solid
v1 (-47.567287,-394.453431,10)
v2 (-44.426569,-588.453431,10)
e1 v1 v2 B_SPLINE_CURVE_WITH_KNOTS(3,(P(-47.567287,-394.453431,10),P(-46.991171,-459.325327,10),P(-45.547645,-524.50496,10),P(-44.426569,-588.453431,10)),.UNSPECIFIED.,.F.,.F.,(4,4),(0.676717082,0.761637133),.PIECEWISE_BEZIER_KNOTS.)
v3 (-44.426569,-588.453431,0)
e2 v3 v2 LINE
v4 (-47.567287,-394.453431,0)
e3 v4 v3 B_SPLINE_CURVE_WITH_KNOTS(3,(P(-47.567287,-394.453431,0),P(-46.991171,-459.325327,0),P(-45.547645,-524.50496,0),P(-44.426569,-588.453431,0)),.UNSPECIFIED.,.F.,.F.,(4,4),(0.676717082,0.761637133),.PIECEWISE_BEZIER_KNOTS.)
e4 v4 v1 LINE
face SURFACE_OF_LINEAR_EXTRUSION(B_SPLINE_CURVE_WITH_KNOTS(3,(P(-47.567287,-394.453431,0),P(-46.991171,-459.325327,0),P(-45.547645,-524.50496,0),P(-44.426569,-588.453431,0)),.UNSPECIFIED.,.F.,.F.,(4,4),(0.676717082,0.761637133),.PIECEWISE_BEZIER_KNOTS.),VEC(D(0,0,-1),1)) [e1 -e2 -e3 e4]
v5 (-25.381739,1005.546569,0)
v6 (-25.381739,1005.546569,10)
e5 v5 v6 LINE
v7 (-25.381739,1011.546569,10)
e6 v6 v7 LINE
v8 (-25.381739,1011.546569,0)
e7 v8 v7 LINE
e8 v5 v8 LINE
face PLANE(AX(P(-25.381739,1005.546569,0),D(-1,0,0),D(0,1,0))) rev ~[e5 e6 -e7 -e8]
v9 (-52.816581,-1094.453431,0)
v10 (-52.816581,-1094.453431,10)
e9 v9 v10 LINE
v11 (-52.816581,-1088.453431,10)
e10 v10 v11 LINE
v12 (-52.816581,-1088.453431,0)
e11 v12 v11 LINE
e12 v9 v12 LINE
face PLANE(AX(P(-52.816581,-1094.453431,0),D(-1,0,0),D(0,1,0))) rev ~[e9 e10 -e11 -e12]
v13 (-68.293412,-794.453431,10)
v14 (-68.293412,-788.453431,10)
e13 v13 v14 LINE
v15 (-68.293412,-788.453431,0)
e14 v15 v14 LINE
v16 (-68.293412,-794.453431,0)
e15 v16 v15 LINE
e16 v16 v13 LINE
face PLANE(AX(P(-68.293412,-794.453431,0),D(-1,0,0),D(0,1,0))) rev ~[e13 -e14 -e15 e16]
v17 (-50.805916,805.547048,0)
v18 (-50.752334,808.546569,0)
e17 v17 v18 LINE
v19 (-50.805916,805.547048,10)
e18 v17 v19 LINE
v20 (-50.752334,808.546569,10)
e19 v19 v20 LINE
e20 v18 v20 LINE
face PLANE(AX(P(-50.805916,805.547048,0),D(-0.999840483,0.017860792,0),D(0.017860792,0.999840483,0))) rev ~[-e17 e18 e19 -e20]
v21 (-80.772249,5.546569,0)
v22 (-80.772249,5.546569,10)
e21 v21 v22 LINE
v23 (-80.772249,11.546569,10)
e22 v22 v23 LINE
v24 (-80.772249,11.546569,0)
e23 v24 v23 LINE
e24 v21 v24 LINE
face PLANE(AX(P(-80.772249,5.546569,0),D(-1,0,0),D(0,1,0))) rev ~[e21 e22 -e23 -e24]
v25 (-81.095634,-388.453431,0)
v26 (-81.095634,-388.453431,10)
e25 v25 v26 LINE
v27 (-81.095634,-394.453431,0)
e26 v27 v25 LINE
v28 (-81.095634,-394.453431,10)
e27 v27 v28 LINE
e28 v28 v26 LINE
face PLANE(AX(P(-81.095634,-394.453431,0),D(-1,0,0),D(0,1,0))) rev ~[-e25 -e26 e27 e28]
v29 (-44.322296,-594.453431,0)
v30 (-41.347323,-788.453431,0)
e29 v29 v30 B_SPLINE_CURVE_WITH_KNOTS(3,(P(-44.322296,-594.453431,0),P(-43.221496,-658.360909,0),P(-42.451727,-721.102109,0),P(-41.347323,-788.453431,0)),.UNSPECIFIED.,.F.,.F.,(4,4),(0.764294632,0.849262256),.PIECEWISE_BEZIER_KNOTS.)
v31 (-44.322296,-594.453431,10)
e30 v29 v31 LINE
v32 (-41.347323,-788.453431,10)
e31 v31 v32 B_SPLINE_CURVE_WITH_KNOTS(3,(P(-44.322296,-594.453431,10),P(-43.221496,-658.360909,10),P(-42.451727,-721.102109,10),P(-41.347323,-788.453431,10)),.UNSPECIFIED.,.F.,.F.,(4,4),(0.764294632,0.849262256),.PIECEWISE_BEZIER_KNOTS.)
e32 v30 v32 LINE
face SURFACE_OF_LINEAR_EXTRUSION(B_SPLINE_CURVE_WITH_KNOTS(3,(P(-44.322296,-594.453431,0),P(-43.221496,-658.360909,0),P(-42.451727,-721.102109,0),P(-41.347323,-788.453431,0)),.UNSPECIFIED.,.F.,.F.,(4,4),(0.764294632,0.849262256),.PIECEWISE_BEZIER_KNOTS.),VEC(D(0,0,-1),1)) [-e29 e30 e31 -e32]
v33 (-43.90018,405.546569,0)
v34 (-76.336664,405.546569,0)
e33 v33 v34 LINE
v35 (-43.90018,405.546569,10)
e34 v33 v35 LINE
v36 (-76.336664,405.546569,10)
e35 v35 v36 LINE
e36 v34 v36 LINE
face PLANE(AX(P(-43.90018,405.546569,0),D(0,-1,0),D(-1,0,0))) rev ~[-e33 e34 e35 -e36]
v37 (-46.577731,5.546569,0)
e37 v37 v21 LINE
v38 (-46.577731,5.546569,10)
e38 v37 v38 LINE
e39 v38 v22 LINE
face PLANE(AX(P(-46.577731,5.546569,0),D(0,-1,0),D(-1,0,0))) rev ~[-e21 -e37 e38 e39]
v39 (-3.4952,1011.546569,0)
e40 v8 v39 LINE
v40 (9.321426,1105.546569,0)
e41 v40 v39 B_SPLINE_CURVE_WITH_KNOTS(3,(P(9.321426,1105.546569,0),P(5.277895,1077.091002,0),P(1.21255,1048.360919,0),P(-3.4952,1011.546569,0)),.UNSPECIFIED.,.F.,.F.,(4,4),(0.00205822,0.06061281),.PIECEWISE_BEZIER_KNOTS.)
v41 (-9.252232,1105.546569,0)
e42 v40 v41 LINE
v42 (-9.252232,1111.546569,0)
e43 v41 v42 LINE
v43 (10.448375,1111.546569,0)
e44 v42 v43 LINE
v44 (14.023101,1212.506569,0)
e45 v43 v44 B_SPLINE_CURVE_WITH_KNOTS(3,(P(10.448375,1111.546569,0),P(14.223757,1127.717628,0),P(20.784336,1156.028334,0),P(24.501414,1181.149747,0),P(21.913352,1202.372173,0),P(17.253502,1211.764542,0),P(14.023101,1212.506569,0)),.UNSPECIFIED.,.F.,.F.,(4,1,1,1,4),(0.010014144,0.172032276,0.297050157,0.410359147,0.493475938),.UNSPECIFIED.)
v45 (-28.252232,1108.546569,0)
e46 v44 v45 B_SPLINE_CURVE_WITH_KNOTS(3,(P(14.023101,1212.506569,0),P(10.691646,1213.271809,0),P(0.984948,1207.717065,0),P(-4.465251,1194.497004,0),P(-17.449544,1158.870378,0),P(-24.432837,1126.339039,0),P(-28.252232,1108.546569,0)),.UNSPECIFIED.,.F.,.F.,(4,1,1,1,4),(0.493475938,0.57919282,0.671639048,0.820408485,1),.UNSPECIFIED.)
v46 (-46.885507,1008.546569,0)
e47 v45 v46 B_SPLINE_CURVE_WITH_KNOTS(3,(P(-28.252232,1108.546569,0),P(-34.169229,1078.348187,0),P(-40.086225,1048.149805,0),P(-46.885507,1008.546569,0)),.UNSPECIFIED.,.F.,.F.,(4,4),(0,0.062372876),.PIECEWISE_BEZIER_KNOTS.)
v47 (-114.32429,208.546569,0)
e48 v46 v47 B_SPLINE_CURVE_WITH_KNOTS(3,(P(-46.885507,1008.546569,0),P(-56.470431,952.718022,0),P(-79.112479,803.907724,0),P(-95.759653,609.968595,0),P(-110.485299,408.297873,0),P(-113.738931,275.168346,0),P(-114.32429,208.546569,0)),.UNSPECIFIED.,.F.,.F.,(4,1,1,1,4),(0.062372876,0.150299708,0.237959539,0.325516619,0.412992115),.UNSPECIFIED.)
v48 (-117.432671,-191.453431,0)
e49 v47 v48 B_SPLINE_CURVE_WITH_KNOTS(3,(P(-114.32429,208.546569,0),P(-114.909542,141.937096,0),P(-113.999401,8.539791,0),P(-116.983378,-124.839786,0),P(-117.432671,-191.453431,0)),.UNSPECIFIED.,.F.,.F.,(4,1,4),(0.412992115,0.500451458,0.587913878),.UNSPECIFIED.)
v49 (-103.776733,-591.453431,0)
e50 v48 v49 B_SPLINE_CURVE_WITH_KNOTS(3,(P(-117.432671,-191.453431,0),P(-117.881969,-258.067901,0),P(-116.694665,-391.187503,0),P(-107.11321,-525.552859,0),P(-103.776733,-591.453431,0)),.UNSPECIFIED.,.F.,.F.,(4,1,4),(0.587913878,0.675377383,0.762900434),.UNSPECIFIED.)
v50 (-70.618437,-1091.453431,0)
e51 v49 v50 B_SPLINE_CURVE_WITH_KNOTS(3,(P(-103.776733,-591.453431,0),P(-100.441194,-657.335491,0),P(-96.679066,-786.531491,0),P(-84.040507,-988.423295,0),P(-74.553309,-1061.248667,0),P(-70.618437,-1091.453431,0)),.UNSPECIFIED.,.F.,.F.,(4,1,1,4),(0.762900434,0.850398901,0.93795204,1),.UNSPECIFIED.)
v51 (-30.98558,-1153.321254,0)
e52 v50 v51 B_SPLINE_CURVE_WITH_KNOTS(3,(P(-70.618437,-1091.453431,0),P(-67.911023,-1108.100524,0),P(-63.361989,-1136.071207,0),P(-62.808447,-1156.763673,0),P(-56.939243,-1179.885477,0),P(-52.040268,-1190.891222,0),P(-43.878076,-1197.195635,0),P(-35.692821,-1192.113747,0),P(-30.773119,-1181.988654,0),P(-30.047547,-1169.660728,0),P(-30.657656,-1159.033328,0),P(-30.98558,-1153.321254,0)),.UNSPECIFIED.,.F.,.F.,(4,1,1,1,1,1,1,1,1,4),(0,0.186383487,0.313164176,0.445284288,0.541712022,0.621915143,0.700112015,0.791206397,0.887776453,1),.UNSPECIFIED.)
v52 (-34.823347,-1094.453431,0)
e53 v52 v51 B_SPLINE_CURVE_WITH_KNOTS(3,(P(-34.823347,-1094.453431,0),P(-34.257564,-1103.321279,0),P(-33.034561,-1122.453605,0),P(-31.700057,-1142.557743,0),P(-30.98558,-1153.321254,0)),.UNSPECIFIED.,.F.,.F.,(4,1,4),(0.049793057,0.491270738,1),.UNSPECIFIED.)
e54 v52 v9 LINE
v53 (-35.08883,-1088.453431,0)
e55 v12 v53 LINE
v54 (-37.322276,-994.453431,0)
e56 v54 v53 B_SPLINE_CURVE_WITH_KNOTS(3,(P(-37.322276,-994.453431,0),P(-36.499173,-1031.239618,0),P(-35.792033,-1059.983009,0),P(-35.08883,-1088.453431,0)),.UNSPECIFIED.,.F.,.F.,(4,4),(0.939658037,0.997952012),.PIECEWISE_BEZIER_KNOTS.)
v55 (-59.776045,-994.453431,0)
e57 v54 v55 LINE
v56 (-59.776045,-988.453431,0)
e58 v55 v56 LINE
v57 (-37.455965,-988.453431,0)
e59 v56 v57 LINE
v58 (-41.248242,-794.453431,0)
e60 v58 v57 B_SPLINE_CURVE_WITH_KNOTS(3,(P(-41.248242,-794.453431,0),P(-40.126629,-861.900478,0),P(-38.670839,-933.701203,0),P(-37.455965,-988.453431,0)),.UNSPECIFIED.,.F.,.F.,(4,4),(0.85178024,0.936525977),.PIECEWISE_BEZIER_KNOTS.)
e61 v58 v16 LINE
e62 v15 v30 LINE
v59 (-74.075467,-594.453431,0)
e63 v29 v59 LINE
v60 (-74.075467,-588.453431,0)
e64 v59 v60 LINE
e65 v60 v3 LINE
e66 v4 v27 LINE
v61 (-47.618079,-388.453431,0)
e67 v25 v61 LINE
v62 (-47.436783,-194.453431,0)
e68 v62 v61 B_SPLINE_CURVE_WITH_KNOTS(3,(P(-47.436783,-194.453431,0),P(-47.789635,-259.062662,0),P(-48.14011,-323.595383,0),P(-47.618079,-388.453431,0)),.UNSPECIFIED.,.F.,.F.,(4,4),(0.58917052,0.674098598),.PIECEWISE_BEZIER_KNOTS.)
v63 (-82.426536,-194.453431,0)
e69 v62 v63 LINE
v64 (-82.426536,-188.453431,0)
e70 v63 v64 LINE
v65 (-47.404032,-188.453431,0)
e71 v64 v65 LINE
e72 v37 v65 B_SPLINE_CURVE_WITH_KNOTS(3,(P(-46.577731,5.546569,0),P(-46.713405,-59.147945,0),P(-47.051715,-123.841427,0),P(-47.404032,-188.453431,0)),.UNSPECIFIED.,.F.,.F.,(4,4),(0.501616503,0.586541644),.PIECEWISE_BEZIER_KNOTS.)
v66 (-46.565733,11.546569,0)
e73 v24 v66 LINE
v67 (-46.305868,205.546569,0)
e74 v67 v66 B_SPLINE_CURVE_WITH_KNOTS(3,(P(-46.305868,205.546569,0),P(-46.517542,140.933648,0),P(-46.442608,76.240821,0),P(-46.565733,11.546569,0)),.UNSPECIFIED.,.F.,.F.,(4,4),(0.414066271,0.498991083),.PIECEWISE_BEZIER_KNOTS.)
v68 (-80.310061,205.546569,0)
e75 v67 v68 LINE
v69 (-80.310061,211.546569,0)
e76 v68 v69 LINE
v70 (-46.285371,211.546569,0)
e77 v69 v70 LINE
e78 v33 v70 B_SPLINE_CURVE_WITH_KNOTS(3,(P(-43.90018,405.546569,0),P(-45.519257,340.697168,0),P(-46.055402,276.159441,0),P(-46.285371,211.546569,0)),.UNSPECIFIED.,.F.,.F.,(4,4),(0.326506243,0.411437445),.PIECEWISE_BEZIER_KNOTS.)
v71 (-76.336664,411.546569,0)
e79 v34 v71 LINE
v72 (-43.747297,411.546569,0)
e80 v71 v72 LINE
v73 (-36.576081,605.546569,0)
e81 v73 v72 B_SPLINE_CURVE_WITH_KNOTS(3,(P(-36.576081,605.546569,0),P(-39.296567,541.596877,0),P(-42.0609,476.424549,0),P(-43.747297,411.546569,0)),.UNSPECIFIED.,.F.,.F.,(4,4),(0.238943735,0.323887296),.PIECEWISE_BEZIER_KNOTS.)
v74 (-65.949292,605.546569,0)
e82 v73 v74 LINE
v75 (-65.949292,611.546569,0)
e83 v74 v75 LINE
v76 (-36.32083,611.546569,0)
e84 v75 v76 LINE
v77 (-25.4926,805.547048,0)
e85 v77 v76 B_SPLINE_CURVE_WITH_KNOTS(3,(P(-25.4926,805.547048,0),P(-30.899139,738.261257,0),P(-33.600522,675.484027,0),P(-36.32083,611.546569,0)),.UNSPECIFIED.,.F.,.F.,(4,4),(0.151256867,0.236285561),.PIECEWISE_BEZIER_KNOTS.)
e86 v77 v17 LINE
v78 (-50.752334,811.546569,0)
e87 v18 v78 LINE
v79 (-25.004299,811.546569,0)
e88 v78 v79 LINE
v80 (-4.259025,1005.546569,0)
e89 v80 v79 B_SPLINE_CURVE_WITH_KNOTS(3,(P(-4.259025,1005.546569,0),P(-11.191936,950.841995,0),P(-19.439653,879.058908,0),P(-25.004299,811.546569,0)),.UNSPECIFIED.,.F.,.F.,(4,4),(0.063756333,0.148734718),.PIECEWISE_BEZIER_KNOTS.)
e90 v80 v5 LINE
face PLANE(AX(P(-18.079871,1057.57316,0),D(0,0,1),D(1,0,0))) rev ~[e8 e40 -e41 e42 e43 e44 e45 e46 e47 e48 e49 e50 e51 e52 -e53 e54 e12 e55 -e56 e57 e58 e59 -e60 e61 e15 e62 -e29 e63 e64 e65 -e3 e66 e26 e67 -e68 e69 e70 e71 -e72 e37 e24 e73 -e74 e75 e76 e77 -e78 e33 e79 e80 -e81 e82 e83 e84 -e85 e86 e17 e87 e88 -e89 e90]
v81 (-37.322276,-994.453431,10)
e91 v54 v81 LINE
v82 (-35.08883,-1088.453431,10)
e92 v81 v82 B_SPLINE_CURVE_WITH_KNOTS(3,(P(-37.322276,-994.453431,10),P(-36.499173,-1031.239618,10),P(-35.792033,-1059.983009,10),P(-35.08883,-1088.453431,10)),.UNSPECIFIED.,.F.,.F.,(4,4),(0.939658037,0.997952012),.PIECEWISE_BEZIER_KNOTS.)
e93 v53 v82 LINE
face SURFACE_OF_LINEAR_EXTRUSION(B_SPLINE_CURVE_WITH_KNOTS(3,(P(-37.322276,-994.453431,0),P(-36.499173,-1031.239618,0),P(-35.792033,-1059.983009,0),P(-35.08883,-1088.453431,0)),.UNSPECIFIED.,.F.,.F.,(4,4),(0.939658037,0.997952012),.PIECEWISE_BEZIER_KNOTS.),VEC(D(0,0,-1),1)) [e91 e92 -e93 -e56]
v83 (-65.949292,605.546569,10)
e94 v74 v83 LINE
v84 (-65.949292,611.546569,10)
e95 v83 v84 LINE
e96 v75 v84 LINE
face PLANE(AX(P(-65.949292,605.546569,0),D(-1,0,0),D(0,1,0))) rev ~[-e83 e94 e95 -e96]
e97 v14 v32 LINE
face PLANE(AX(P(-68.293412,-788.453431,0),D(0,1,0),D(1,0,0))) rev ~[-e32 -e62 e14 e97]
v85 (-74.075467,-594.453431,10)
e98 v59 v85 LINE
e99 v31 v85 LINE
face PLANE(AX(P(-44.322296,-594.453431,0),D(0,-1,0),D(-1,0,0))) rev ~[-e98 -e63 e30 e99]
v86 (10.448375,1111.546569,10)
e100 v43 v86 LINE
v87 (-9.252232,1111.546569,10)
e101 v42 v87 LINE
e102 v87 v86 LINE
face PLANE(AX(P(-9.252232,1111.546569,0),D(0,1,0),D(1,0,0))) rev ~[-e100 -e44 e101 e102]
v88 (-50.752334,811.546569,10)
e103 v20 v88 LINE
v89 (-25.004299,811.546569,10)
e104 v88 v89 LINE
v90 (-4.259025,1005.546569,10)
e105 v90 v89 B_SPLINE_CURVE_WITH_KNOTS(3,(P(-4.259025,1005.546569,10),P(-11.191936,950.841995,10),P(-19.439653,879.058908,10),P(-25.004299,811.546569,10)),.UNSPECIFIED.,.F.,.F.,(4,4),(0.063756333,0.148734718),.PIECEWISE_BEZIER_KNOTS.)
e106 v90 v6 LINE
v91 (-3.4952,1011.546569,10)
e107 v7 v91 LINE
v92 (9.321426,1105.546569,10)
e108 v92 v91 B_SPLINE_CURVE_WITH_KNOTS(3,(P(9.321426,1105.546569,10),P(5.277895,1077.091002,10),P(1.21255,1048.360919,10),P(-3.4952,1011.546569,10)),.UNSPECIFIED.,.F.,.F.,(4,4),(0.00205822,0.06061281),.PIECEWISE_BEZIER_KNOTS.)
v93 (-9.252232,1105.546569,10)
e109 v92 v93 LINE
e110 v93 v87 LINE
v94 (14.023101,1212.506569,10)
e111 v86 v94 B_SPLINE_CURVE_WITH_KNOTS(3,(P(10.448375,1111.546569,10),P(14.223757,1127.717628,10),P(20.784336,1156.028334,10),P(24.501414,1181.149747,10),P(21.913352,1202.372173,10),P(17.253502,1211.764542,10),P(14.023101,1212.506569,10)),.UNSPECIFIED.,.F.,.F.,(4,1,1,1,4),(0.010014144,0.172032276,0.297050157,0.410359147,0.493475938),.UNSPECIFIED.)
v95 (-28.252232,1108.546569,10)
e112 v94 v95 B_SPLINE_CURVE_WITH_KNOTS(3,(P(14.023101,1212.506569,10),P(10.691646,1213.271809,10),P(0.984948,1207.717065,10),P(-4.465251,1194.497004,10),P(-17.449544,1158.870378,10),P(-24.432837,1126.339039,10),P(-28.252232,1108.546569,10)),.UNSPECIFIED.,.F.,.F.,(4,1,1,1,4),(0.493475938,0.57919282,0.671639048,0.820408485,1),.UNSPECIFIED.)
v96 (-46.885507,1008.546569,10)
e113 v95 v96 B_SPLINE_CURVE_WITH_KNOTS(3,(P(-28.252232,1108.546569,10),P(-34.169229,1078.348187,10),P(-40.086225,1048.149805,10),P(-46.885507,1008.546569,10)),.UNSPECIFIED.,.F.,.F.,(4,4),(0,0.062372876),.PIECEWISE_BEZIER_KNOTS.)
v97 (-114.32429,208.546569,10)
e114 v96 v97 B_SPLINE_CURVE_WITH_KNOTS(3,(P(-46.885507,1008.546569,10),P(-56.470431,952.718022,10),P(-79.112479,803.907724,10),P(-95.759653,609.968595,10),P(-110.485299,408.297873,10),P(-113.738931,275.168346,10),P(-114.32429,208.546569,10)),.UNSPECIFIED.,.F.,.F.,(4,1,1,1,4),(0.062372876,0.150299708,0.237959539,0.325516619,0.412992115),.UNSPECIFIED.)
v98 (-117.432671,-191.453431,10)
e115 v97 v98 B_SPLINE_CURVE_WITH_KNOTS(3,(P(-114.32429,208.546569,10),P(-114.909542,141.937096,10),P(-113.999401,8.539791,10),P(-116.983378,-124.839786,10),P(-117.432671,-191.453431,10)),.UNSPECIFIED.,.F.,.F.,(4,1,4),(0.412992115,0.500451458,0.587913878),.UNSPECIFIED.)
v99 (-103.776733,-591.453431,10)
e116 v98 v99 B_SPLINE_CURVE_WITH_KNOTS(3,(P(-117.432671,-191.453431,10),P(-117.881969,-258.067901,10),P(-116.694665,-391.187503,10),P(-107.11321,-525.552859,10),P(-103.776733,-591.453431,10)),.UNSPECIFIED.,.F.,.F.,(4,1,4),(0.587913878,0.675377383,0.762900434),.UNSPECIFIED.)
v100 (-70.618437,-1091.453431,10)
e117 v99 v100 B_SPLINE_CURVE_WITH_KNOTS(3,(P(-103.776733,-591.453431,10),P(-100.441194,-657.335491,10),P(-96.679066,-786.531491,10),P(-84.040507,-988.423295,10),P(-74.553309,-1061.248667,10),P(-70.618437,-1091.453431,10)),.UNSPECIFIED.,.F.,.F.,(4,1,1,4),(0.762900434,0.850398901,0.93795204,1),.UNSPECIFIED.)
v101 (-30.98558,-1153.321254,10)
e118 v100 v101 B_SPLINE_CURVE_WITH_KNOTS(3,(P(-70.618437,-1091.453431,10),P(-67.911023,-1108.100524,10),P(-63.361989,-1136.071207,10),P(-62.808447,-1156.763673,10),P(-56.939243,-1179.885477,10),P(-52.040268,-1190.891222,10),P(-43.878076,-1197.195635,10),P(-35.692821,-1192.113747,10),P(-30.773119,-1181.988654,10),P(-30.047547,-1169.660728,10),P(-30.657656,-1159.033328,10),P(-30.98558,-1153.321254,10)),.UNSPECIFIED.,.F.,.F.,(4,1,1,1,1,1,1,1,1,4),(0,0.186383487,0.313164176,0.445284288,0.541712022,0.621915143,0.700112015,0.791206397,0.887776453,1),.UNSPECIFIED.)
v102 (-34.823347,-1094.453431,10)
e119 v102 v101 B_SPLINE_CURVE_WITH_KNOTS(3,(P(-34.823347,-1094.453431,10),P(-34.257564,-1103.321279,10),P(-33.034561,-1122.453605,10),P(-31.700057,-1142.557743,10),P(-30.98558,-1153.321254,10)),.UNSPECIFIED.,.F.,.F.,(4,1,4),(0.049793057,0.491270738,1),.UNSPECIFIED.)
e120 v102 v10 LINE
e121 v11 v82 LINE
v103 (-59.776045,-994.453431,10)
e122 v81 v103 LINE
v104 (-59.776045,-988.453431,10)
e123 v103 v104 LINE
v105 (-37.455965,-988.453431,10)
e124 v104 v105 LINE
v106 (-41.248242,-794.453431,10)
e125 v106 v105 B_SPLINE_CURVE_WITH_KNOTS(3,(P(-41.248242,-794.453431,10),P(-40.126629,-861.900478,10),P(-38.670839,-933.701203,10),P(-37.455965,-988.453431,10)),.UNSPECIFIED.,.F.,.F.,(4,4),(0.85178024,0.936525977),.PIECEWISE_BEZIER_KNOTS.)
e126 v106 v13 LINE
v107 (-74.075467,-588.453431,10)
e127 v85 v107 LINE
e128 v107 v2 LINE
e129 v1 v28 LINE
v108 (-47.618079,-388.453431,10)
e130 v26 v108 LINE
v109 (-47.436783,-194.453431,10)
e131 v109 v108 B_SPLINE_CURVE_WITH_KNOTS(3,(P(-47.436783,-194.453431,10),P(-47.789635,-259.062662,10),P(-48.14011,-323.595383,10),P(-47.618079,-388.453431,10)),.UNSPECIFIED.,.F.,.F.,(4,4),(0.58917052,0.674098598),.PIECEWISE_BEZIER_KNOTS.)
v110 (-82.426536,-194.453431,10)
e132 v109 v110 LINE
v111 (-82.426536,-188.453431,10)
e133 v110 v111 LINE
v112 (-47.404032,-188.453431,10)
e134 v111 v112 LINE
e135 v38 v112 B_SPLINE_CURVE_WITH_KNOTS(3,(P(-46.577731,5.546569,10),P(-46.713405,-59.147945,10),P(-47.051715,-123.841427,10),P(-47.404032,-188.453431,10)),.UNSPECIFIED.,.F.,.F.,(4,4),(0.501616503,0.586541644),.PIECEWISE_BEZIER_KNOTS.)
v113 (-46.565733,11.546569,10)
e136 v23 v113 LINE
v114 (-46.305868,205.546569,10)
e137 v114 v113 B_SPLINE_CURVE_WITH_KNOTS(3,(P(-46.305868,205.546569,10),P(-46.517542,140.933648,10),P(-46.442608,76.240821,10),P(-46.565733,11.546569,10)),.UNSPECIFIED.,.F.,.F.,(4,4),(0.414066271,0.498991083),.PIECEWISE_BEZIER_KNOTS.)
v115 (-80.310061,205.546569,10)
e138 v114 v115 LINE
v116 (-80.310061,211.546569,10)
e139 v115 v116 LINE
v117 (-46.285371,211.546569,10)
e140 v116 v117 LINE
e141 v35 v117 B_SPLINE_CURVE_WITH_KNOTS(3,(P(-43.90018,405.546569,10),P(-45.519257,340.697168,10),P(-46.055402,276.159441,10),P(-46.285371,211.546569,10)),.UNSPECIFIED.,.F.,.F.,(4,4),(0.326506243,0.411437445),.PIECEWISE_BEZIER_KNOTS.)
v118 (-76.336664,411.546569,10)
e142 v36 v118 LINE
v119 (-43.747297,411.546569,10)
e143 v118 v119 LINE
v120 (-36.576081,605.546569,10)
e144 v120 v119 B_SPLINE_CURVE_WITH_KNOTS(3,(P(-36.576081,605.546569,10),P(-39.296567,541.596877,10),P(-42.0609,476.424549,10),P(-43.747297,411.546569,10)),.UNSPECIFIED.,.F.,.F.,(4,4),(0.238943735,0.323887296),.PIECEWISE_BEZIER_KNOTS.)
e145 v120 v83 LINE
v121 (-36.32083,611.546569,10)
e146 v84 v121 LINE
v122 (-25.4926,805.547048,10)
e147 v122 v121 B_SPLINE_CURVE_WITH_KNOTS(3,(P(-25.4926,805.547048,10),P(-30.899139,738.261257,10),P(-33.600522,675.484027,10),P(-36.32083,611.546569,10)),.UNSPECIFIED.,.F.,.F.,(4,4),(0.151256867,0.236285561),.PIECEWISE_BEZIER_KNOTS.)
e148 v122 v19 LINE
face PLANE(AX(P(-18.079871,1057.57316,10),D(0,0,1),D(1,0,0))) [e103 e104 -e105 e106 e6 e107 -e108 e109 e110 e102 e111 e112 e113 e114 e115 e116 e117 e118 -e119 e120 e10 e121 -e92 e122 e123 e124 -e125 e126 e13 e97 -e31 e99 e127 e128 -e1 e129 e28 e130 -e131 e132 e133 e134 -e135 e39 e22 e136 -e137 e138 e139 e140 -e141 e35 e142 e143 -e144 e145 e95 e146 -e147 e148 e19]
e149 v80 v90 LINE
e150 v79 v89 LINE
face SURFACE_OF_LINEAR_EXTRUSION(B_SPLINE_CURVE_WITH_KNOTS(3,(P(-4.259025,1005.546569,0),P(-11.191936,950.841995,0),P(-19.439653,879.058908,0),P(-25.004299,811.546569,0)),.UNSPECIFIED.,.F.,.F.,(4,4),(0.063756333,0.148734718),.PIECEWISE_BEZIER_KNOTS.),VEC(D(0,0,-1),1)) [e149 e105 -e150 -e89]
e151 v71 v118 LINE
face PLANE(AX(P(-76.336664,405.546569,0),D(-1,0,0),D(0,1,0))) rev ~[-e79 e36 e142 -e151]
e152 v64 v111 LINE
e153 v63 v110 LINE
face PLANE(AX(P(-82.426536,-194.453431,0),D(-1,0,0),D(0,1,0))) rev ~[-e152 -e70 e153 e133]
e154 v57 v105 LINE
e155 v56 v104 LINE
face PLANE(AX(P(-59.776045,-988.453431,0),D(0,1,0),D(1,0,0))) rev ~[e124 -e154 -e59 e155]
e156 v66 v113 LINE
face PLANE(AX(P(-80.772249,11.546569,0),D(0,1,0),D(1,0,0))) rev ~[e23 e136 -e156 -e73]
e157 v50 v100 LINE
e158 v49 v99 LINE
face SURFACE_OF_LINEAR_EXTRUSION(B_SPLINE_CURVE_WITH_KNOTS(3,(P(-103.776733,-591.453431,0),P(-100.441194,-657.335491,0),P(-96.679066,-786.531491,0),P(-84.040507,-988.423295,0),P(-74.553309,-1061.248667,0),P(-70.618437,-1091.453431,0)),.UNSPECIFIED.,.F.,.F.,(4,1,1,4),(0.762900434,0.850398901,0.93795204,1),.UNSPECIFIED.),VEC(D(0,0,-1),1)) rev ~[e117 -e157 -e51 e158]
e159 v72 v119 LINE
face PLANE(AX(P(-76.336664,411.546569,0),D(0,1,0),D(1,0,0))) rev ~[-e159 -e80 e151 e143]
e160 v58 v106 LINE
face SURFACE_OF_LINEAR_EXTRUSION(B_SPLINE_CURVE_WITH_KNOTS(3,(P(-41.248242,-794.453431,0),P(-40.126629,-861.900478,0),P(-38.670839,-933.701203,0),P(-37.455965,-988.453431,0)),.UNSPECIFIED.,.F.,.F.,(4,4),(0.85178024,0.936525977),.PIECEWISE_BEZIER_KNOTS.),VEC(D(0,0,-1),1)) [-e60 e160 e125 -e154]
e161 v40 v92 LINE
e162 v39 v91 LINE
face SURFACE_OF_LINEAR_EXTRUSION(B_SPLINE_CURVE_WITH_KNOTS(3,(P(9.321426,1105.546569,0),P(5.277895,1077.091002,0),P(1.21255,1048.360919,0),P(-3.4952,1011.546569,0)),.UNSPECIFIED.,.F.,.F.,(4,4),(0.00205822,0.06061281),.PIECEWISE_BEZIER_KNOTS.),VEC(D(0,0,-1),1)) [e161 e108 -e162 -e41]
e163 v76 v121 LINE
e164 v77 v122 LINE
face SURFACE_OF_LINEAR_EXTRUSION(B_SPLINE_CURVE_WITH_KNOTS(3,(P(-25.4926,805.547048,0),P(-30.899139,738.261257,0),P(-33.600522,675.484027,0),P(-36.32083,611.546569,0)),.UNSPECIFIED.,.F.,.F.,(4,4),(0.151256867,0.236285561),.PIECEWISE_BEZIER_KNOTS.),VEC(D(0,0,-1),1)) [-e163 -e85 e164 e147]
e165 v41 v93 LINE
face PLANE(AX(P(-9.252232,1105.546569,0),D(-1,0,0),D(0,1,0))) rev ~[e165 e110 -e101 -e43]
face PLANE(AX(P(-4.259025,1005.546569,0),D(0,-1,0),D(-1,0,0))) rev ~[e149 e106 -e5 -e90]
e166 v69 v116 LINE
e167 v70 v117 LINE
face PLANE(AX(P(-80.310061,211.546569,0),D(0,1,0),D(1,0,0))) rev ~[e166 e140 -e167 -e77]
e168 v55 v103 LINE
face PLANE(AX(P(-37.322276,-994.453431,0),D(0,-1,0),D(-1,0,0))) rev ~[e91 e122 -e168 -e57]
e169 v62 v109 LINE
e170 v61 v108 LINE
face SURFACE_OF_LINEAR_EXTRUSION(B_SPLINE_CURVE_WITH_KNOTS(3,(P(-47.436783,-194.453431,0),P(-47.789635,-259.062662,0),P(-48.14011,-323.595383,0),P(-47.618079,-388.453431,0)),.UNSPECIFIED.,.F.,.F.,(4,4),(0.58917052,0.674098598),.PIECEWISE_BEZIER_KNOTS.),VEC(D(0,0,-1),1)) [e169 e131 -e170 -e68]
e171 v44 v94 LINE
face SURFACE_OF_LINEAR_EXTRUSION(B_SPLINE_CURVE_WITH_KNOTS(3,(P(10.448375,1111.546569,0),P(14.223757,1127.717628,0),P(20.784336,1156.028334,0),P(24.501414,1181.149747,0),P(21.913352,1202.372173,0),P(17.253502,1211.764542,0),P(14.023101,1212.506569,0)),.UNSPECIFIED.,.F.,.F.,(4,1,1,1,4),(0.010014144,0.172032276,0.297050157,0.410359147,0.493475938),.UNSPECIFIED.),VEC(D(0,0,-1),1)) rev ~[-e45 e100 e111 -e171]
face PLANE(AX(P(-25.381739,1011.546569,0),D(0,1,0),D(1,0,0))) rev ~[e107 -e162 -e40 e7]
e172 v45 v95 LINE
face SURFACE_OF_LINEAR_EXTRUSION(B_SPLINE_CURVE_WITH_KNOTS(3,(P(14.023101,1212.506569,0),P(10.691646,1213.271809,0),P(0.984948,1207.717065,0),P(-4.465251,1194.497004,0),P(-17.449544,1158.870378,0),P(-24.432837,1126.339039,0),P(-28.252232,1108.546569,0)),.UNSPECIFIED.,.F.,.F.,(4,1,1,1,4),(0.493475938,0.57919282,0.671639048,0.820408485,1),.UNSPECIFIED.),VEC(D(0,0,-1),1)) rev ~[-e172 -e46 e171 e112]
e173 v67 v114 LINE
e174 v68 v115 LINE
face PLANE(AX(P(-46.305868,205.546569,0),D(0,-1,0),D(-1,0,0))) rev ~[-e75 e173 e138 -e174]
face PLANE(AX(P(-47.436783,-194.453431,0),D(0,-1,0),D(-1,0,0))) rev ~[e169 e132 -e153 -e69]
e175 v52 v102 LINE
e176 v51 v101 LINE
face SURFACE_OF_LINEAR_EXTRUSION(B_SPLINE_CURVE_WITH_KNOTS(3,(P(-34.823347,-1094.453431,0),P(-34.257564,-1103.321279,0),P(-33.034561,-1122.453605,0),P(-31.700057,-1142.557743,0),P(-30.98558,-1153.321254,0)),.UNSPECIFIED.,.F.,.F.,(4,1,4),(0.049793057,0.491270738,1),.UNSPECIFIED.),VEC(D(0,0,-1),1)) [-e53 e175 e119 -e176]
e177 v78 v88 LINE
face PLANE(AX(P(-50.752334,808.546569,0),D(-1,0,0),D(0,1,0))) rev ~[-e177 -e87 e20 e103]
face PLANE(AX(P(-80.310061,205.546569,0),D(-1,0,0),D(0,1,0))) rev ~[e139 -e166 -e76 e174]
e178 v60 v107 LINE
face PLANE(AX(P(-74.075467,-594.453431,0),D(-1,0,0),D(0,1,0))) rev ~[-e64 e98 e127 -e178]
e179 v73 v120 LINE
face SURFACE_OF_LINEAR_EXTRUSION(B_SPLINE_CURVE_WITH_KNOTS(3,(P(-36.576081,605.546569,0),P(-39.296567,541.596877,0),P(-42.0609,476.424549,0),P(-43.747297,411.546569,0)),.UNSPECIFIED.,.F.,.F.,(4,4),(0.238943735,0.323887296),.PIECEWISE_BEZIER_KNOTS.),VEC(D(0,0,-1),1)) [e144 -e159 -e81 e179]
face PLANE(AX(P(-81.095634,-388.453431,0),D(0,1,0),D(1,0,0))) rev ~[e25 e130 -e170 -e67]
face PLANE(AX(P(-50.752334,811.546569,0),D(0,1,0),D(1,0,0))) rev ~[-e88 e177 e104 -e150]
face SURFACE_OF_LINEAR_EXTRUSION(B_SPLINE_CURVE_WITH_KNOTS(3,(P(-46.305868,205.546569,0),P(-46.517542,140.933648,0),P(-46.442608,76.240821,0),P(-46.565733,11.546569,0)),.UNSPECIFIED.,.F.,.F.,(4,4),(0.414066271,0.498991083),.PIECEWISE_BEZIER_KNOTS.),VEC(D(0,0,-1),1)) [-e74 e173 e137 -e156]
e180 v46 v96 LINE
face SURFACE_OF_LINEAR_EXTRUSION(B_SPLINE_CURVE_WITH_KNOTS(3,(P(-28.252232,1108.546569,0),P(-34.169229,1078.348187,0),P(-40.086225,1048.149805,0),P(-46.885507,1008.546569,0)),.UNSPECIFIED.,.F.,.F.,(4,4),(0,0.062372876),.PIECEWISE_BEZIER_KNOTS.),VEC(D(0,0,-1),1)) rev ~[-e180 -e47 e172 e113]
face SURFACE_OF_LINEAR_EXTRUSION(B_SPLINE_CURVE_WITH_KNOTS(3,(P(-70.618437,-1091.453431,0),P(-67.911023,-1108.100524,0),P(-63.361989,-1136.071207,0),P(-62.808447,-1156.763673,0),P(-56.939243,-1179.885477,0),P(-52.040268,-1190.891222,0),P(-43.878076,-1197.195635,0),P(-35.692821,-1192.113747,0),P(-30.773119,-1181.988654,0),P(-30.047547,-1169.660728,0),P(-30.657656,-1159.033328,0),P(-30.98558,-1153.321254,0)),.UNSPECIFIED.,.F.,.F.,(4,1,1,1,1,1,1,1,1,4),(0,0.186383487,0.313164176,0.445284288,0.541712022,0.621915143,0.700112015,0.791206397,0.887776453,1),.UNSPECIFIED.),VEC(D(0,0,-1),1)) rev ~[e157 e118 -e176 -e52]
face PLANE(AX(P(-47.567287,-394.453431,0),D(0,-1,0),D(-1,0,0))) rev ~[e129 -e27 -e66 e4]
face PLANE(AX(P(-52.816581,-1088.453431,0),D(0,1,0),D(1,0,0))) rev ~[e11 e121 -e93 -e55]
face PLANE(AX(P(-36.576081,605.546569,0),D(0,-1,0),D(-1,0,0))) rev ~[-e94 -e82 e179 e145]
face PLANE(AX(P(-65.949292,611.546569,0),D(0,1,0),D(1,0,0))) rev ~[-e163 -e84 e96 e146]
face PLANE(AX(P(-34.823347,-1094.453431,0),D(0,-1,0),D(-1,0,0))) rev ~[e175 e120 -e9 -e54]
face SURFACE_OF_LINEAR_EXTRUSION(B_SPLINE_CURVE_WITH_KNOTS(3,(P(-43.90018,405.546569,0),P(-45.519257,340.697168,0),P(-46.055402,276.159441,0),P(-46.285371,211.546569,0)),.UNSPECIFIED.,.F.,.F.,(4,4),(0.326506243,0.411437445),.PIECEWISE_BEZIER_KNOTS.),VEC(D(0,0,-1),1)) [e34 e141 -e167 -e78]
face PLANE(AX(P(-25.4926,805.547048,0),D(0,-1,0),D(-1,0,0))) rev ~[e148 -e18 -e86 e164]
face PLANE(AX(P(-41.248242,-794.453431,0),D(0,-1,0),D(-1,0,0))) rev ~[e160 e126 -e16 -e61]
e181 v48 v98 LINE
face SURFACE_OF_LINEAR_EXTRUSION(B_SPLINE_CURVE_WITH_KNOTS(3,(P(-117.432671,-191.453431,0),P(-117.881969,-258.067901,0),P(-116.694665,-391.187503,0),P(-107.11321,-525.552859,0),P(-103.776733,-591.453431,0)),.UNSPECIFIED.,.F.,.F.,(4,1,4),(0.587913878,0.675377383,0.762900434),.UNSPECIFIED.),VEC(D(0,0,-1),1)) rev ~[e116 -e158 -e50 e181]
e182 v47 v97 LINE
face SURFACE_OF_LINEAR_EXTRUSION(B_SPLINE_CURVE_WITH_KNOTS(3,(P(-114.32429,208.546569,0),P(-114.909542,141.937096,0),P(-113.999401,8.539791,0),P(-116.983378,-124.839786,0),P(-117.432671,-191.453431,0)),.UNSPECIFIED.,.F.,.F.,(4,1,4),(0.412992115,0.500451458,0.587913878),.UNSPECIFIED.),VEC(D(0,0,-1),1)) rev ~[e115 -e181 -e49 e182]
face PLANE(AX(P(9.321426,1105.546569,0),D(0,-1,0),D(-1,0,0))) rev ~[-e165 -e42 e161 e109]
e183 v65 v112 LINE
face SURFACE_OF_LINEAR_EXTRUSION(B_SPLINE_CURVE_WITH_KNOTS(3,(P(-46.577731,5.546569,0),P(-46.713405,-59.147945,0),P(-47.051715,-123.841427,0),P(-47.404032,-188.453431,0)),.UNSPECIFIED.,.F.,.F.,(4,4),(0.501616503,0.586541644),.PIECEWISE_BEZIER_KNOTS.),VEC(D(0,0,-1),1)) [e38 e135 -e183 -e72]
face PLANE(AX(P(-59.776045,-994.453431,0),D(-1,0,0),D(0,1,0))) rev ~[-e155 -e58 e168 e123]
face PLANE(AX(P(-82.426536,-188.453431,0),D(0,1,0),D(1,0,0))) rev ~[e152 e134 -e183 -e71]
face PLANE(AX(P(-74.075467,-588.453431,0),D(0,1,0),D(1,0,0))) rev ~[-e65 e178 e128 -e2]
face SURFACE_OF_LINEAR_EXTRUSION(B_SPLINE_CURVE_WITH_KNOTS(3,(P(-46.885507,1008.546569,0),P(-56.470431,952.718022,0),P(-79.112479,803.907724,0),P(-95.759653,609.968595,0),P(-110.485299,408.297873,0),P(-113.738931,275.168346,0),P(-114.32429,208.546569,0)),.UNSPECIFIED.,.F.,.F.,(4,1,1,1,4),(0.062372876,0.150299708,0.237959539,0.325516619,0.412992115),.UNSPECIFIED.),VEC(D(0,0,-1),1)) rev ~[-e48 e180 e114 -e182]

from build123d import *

# Parameters (mm, degrees)
F1_DEPTH = 10


# Not quite as in the source:
# - a feature names something its author has since deleted; it is built from what else it names


with BuildPart() as f1:
    # F0 (on Top) → F1 (new body)
    with BuildSketch(Plane.XY):
        with BuildLine():
            Line((-9.2522319783, 1105.5465694817), (-9.2522319783, 1108.5465694817))
            Line((-9.2522319783, 1108.5465694817), (-28.2522319783, 1108.5465694817))
            add(Edge.make_bspline(
                [(-28.2522319783, 1108.5465694817), (-34.1692287273, 1078.3481872981), (-40.0862254764, 1048.1498051145), (-46.885506853, 1008.5465694817)],
                knots=[0, 0, 0, 0, 0.0623728759, 0.0623728759, 0.0623728759, 0.0623728759], degree=3))
            Line((-46.885506853, 1008.5465694817), (-25.3817387583, 1008.5465694817))
            Line((-25.3817387583, 1008.5465694817), (-25.3817387583, 1011.5465694817))
            Line((-25.3817387583, 1011.5465694817), (-3.4951998214, 1011.5465694817))
            add(Edge.make_bspline(
                [(9.3214260817, 1105.5465694817), (5.2778951966, 1077.0910022719), (1.2125502532, 1048.3609188135), (-3.4951998214, 1011.5465694817)],
                knots=[0.0020582204, 0.0020582204, 0.0020582204, 0.0020582204, 0.0606128099, 0.0606128099, 0.0606128099, 0.0606128099], degree=3))
            Line((9.3214260817, 1105.5465694817), (-9.2522319783, 1105.5465694817))
        make_face()
        with BuildLine():
            Line((-28.2522319783, 1108.5465694817), (-9.2522319783, 1108.5465694817))
            Line((-9.2522319783, 1108.5465694817), (-9.2522319783, 1111.5465694817))
            Line((-9.2522319783, 1111.5465694817), (10.4483753261, 1111.5465694817))
            add(Edge.make_bspline(
                [(10.4483753261, 1111.5465694817), (14.2237569857, 1127.7176279013), (20.7843357368, 1156.0283342705), (24.50141426, 1181.1497468298), (21.913351831, 1202.3721726285), (17.2535020339, 1211.7645420112), (14.0231014783, 1212.5065694817)],
                knots=[0.0100141442, 0.0100141442, 0.0100141442, 0.0100141442, 0.1720322765, 0.2970501568, 0.4103591472, 0.4934759383, 0.4934759383, 0.4934759383, 0.4934759383], degree=3))
            add(Edge.make_bspline(
                [(14.0231014783, 1212.5065694817), (10.6916463361, 1213.2718093304), (0.9849483202, 1207.717065294), (-4.4652508998, 1194.4970040922), (-17.4495437423, 1158.8703779353), (-24.4328369098, 1126.3390394336), (-28.2522319783, 1108.5465694817)],
                knots=[0.4934759383, 0.4934759383, 0.4934759383, 0.4934759383, 0.5791928197, 0.6716390479, 0.8204084848, 1, 1, 1, 1], degree=3))
        make_face()
        with BuildLine():
            Line((-25.3817387583, 1008.5465694817), (-46.885506853, 1008.5465694817))
            add(Edge.make_bspline(
                [(-46.885506853, 1008.5465694817), (-56.4704307745, 952.7180223817), (-67.8086700034, 878.1997316325), (-76.2546409025, 808.5465694817)],
                knots=[0.0623728759, 0.0623728759, 0.0623728759, 0.0623728759, 0.1502997077, 0.1502997077, 0.1502997077, 0.1502997077], degree=3))
            Line((-76.2546409025, 808.5465694817), (-50.7523337375, 808.5465694817))
            Line((-50.7523337375, 808.5465694817), (-50.7523337375, 811.5465694817))
            Line((-50.7523337375, 811.5465694817), (-25.0042987138, 811.5465694817))
            add(Edge.make_bspline(
                [(-4.2590252459, 1005.5465694817), (-11.1919357354, 950.8419950912), (-19.4396527515, 879.0589079331), (-25.0042987138, 811.5465694817)],
                knots=[0.0637563334, 0.0637563334, 0.0637563334, 0.0637563334, 0.1487347177, 0.1487347177, 0.1487347177, 0.1487347177], degree=3))
            Line((-4.2590252459, 1005.5465694817), (-25.3817387583, 1005.5465694817))
            Line((-25.3817387583, 1005.5465694817), (-25.3817387583, 1008.5465694817))
        make_face()
        with BuildLine():
            Line((-50.7523337375, 808.5465694817), (-76.2546409025, 808.5465694817))
            add(Edge.make_bspline(
                [(-76.2546409025, 808.5465694817), (-84.6749646264, 739.1049172777), (-90.2205587707, 674.4988914733), (-95.4501271993, 608.5465694817)],
                knots=[0.1502997077, 0.1502997077, 0.1502997077, 0.1502997077, 0.2379595395, 0.2379595395, 0.2379595395, 0.2379595395], degree=3))
            Line((-95.4501271993, 608.5465694817), (-65.9492915816, 608.5465694817))
            Line((-65.9492915816, 608.5465694817), (-65.9492915816, 611.5465694817))
            Line((-65.9492915816, 611.5465694817), (-36.3208296657, 611.5465694817))
            add(Edge.make_bspline(
                [(-25.492600007, 805.5470480317), (-30.8991386303, 738.261256599), (-33.600522451, 675.484027067), (-36.3208296657, 611.5465694817)],
                knots=[0.1512568673, 0.1512568673, 0.1512568673, 0.1512568673, 0.2362855612, 0.2362855612, 0.2362855612, 0.2362855612], degree=3))
            Line((-25.492600007, 805.5470480317), (-50.8059161147, 805.5470480317))
            Line((-50.8059161147, 805.5470480317), (-50.7523337375, 808.5465694817))
        make_face()
        with BuildLine():
            Line((-65.9492915816, 608.5465694817), (-95.4501271993, 608.5465694817))
            add(Edge.make_bspline(
                [(-95.4501271993, 608.5465694817), (-100.6735657013, 542.6715546134), (-105.5817189232, 475.4533978756), (-108.8488180837, 408.5465694817)],
                knots=[0.2379595395, 0.2379595395, 0.2379595395, 0.2379595395, 0.3255166193, 0.3255166193, 0.3255166193, 0.3255166193], degree=3))
            Line((-108.8488180837, 408.5465694817), (-76.3366638949, 408.5465694817))
            Line((-76.3366638949, 408.5465694817), (-76.3366638949, 411.5465694817))
            Line((-76.3366638949, 411.5465694817), (-43.7472965242, 411.5465694817))
            add(Edge.make_bspline(
                [(-36.576081022, 605.5465694817), (-39.2965672487, 541.5968769288), (-42.0608997966, 476.4245488132), (-43.7472965243, 411.5465694817)],
                knots=[0.2389437345, 0.2389437345, 0.2389437345, 0.2389437345, 0.3238872962, 0.3238872962, 0.3238872962, 0.3238872962], degree=3))
            Line((-36.576081022, 605.5465694817), (-65.9492915816, 605.5465694817))
            Line((-65.9492915816, 605.5465694817), (-65.9492915816, 608.5465694817))
        make_face()
        with BuildLine():
            Line((-76.3366638949, 408.5465694817), (-108.8488180837, 408.5465694817))
            add(Edge.make_bspline(
                [(-108.8488180837, 408.5465694817), (-112.112873039, 341.7020832768), (-113.7389306982, 275.1683455095), (-114.3242902488, 208.5465694817)],
                knots=[0.3255166193, 0.3255166193, 0.3255166193, 0.3255166193, 0.4129921155, 0.4129921155, 0.4129921155, 0.4129921155], degree=3))
            Line((-114.3242902488, 208.5465694817), (-80.310060953, 208.5465694817))
            Line((-80.310060953, 208.5465694817), (-80.310060953, 211.5465694817))
            Line((-80.310060953, 211.5465694817), (-46.2853714025, 211.5465694817))
            add(Edge.make_bspline(
                [(-43.9001795453, 405.5465694817), (-45.519256644, 340.6971675299), (-46.0554016999, 276.1594412286), (-46.2853714025, 211.5465694817)],
                knots=[0.3265062426, 0.3265062426, 0.3265062426, 0.3265062426, 0.4114374445, 0.4114374445, 0.4114374445, 0.4114374445], degree=3))
            Line((-43.9001795453, 405.5465694817), (-76.3366638949, 405.5465694817))
            Line((-76.3366638949, 405.5465694817), (-76.3366638949, 408.5465694817))
        make_face()
        with BuildLine():
            Line((-80.310060953, 208.5465694817), (-114.3242902488, 208.5465694817))
            add(Edge.make_bspline(
                [(-114.3242902488, 208.5465694817), (-114.9095417049, 141.9370960513), (-114.4544793743, 75.2396168723), (-114.9729122534, 8.5465694817)],
                knots=[0.4129921155, 0.4129921155, 0.4129921155, 0.4129921155, 0.5004514582, 0.5004514582, 0.5004514582, 0.5004514582], degree=3))
            Line((-114.9729122534, 8.5465694817), (-80.772249135, 8.5465694817))
            Line((-80.772249135, 8.5465694817), (-80.772249135, 11.5465694817))
            Line((-80.772249135, 11.5465694817), (-46.5657327214, 11.5465694817))
            add(Edge.make_bspline(
                [(-46.3058677148, 205.5465694817), (-46.517541999, 140.9336478574), (-46.4426078998, 76.2408210046), (-46.5657327214, 11.5465694817)],
                knots=[0.4140662707, 0.4140662707, 0.4140662707, 0.4140662707, 0.4989910833, 0.4989910833, 0.4989910833, 0.4989910833], degree=3))
            Line((-46.3058677148, 205.5465694817), (-80.310060953, 205.5465694817))
            Line((-80.310060953, 205.5465694817), (-80.310060953, 208.5465694817))
        make_face()
        with BuildLine():
            Line((-80.772249135, 8.5465694817), (-114.9729122534, 8.5465694817))
            add(Edge.make_bspline(
                [(-114.9729122534, 8.5465694817), (-115.4913633728, -58.1488243975), (-116.9833782047, -124.8397861765), (-117.4326707445, -191.4534305183)],
                knots=[0.5004514582, 0.5004514582, 0.5004514582, 0.5004514582, 0.587913878, 0.587913878, 0.587913878, 0.587913878], degree=3))
            Line((-117.4326707445, -191.4534305183), (-82.4265356335, -191.4534305183))
            Line((-82.4265356335, -191.4534305183), (-82.4265356335, -188.4534305183))
            Line((-82.4265356335, -188.4534305183), (-47.4040323866, -188.4534305183))
            add(Edge.make_bspline(
                [(-46.5777314963, 5.5465694817), (-46.7134050172, -59.1479448978), (-47.0517150176, -123.8414273541), (-47.4040323866, -188.4534305183)],
                knots=[0.5016165032, 0.5016165032, 0.5016165032, 0.5016165032, 0.5865416442, 0.5865416442, 0.5865416442, 0.5865416442], degree=3))
            Line((-46.5777314963, 5.5465694817), (-80.772249135, 5.5465694817))
            Line((-80.772249135, 5.5465694817), (-80.772249135, 8.5465694817))
        make_face()
        with BuildLine():
            Line((-82.4265356335, -191.4534305183), (-117.4326707445, -191.4534305183))
            add(Edge.make_bspline(
                [(-117.4326707445, -191.4534305183), (-117.8819688578, -258.0679012195), (-117.2885188084, -324.6050525653), (-114.5979590791, -391.4534305183)],
                knots=[0.587913878, 0.587913878, 0.587913878, 0.587913878, 0.6753773828, 0.6753773828, 0.6753773828, 0.6753773828], degree=3))
            Line((-114.5979590791, -391.4534305183), (-81.0956338475, -391.4534305183))
            Line((-81.0956338475, -391.4534305183), (-81.0956338475, -388.4534305183))
            Line((-81.0956338475, -388.4534305183), (-47.6180785507, -388.4534305183))
            add(Edge.make_bspline(
                [(-47.4367827083, -194.4534305183), (-47.7896354912, -259.0626621028), (-48.1401096643, -323.5953829529), (-47.6180785507, -388.4534305183)],
                knots=[0.58917052, 0.58917052, 0.58917052, 0.58917052, 0.6740985981, 0.6740985981, 0.6740985981, 0.6740985981], degree=3))
            Line((-47.4367827083, -194.4534305183), (-82.4265356335, -194.4534305183))
            Line((-82.4265356335, -194.4534305183), (-82.4265356335, -191.4534305183))
        make_face()
        with BuildLine():
            Line((-81.0956338475, -391.4534305183), (-114.5979590791, -391.4534305183))
            add(Edge.make_bspline(
                [(-114.5979590791, -391.4534305183), (-111.9055675807, -458.347319741), (-107.1132099499, -525.5528594896), (-103.7767332928, -591.4534305183)],
                knots=[0.6753773828, 0.6753773828, 0.6753773828, 0.6753773828, 0.762900434, 0.762900434, 0.762900434, 0.762900434], degree=3))
            Line((-103.7767332928, -591.4534305183), (-74.0754674311, -591.4534305183))
            Line((-74.0754674311, -591.4534305183), (-74.0754674311, -588.4534305183))
            Line((-74.0754674311, -588.4534305183), (-44.426569062, -588.4534305183))
            add(Edge.make_bspline(
                [(-47.5672869388, -394.4534305183), (-46.9911709166, -459.3253273899), (-45.5476453008, -524.5049596078), (-44.426569062, -588.4534305183)],
                knots=[0.6767170821, 0.6767170821, 0.6767170821, 0.6767170821, 0.7616371329, 0.7616371329, 0.7616371329, 0.7616371329], degree=3))
            Line((-47.5672869388, -394.4534305183), (-81.0956338475, -394.4534305183))
            Line((-81.0956338475, -394.4534305183), (-81.0956338475, -391.4534305183))
        make_face()
        with BuildLine():
            Line((-74.0754674311, -591.4534305183), (-103.7767332928, -591.4534305183))
            add(Edge.make_bspline(
                [(-103.7767332928, -591.4534305183), (-100.4411938204, -657.3354907033), (-98.5607175504, -721.913315172), (-95.2888672995, -791.4534305183)],
                knots=[0.762900434, 0.762900434, 0.762900434, 0.762900434, 0.8503989007, 0.8503989007, 0.8503989007, 0.8503989007], degree=3))
            Line((-95.2888672995, -791.4534305183), (-68.2934120383, -791.4534305183))
            Line((-68.2934120383, -791.4534305183), (-68.2934120383, -788.4534305183))
            Line((-68.2934120383, -788.4534305183), (-41.3473226027, -788.4534305183))
            add(Edge.make_bspline(
                [(-44.3222964296, -594.4534305183), (-43.2214963704, -658.360909415), (-42.4517270587, -721.1021087734), (-41.3473226027, -788.4534305183)],
                knots=[0.7642946324, 0.7642946324, 0.7642946324, 0.7642946324, 0.8492622563, 0.8492622563, 0.8492622563, 0.8492622563], degree=3))
            Line((-44.3222964296, -594.4534305183), (-74.0754674311, -594.4534305183))
            Line((-74.0754674311, -594.4534305183), (-74.0754674311, -591.4534305183))
        make_face()
        with BuildLine():
            Line((-68.2934120383, -791.4534305183), (-95.2888672995, -791.4534305183))
            add(Edge.make_bspline(
                [(-95.2888672995, -791.4534305183), (-92.0149726534, -861.0369975725), (-87.3479647004, -935.5890587547), (-82.1628302646, -991.4534305183)],
                knots=[0.8503989007, 0.8503989007, 0.8503989007, 0.8503989007, 0.9379520403, 0.9379520403, 0.9379520403, 0.9379520403], degree=3))
            Line((-82.1628302646, -991.4534305183), (-59.7760454191, -991.4534305183))
            Line((-59.7760454191, -991.4534305183), (-59.7760454191, -988.4534305183))
            Line((-59.7760454191, -988.4534305183), (-37.4559647617, -988.4534305183))
            add(Edge.make_bspline(
                [(-41.2482418592, -794.4534305183), (-40.1266287573, -861.9004781348), (-38.6708390195, -933.7012026364), (-37.4559647617, -988.4534305183)],
                knots=[0.8517802395, 0.8517802395, 0.8517802395, 0.8517802395, 0.9365259774, 0.9365259774, 0.9365259774, 0.9365259774], degree=3))
            Line((-41.2482418592, -794.4534305183), (-68.2934120383, -794.4534305183))
            Line((-68.2934120383, -794.4534305183), (-68.2934120383, -791.4534305183))
        make_face()
        with BuildLine():
            Line((-59.7760454191, -991.4534305183), (-82.1628302646, -991.4534305183))
            add(Edge.make_bspline(
                [(-82.1628302646, -991.4534305183), (-78.4881817721, -1031.0439044063), (-74.5533092769, -1061.2486674623), (-70.6184367817, -1091.4534305183)],
                knots=[0.9379520403, 0.9379520403, 0.9379520403, 0.9379520403, 1, 1, 1, 1], degree=3))
            Line((-70.6184367817, -1091.4534305183), (-52.8165805825, -1091.4534305183))
            Line((-52.8165805825, -1091.4534305183), (-52.8165805825, -1088.4534305183))
            Line((-52.8165805825, -1088.4534305183), (-35.0888296498, -1088.4534305183))
            add(Edge.make_bspline(
                [(-37.322275987, -994.4534305183), (-36.4991726981, -1031.2396183628), (-35.7920332849, -1059.9830094592), (-35.0888296498, -1088.4534305183)],
                knots=[0.9396580371, 0.9396580371, 0.9396580371, 0.9396580371, 0.9979520124, 0.9979520124, 0.9979520124, 0.9979520124], degree=3))
            Line((-37.322275987, -994.4534305183), (-59.7760454191, -994.4534305183))
            Line((-59.7760454191, -994.4534305183), (-59.7760454191, -991.4534305183))
        make_face()
        with BuildLine():
            Line((-52.8165805825, -1091.4534305183), (-70.6184367817, -1091.4534305183))
            add(Edge.make_bspline(
                [(-70.6184367817, -1091.4534305183), (-67.9110233409, -1108.1005244006), (-63.3619889151, -1136.0712074231), (-62.8084472686, -1156.7636726537), (-56.9392429668, -1179.8854765827), (-52.0402683291, -1190.8912220635), (-43.8780764691, -1197.1956346468), (-35.6928205779, -1192.113746687), (-30.7731194715, -1181.9886543329), (-30.0475473892, -1169.6607279781), (-30.6576558665, -1159.033327889), (-30.985580365, -1153.3212537692)],
                knots=[0, 0, 0, 0, 0.1863834872, 0.3131641762, 0.4452842877, 0.5417120225, 0.6219151427, 0.7001120149, 0.7912063967, 0.8877764526, 1, 1, 1, 1], degree=3))
            add(Edge.make_bspline(
                [(-34.8233472068, -1094.4534305183), (-34.257564492, -1103.3212790556), (-33.0345610691, -1122.4536049764), (-31.700057419, -1142.5577425607), (-30.985580365, -1153.3212537692)],
                knots=[0.049793057, 0.049793057, 0.049793057, 0.049793057, 0.4912707377, 1, 1, 1, 1], degree=3))
            Line((-34.8233472068, -1094.4534305183), (-52.8165805825, -1094.4534305183))
            Line((-52.8165805825, -1094.4534305183), (-52.8165805825, -1091.4534305183))
        make_face()
    extrude(amount=F1_DEPTH)


solid = f1.part
